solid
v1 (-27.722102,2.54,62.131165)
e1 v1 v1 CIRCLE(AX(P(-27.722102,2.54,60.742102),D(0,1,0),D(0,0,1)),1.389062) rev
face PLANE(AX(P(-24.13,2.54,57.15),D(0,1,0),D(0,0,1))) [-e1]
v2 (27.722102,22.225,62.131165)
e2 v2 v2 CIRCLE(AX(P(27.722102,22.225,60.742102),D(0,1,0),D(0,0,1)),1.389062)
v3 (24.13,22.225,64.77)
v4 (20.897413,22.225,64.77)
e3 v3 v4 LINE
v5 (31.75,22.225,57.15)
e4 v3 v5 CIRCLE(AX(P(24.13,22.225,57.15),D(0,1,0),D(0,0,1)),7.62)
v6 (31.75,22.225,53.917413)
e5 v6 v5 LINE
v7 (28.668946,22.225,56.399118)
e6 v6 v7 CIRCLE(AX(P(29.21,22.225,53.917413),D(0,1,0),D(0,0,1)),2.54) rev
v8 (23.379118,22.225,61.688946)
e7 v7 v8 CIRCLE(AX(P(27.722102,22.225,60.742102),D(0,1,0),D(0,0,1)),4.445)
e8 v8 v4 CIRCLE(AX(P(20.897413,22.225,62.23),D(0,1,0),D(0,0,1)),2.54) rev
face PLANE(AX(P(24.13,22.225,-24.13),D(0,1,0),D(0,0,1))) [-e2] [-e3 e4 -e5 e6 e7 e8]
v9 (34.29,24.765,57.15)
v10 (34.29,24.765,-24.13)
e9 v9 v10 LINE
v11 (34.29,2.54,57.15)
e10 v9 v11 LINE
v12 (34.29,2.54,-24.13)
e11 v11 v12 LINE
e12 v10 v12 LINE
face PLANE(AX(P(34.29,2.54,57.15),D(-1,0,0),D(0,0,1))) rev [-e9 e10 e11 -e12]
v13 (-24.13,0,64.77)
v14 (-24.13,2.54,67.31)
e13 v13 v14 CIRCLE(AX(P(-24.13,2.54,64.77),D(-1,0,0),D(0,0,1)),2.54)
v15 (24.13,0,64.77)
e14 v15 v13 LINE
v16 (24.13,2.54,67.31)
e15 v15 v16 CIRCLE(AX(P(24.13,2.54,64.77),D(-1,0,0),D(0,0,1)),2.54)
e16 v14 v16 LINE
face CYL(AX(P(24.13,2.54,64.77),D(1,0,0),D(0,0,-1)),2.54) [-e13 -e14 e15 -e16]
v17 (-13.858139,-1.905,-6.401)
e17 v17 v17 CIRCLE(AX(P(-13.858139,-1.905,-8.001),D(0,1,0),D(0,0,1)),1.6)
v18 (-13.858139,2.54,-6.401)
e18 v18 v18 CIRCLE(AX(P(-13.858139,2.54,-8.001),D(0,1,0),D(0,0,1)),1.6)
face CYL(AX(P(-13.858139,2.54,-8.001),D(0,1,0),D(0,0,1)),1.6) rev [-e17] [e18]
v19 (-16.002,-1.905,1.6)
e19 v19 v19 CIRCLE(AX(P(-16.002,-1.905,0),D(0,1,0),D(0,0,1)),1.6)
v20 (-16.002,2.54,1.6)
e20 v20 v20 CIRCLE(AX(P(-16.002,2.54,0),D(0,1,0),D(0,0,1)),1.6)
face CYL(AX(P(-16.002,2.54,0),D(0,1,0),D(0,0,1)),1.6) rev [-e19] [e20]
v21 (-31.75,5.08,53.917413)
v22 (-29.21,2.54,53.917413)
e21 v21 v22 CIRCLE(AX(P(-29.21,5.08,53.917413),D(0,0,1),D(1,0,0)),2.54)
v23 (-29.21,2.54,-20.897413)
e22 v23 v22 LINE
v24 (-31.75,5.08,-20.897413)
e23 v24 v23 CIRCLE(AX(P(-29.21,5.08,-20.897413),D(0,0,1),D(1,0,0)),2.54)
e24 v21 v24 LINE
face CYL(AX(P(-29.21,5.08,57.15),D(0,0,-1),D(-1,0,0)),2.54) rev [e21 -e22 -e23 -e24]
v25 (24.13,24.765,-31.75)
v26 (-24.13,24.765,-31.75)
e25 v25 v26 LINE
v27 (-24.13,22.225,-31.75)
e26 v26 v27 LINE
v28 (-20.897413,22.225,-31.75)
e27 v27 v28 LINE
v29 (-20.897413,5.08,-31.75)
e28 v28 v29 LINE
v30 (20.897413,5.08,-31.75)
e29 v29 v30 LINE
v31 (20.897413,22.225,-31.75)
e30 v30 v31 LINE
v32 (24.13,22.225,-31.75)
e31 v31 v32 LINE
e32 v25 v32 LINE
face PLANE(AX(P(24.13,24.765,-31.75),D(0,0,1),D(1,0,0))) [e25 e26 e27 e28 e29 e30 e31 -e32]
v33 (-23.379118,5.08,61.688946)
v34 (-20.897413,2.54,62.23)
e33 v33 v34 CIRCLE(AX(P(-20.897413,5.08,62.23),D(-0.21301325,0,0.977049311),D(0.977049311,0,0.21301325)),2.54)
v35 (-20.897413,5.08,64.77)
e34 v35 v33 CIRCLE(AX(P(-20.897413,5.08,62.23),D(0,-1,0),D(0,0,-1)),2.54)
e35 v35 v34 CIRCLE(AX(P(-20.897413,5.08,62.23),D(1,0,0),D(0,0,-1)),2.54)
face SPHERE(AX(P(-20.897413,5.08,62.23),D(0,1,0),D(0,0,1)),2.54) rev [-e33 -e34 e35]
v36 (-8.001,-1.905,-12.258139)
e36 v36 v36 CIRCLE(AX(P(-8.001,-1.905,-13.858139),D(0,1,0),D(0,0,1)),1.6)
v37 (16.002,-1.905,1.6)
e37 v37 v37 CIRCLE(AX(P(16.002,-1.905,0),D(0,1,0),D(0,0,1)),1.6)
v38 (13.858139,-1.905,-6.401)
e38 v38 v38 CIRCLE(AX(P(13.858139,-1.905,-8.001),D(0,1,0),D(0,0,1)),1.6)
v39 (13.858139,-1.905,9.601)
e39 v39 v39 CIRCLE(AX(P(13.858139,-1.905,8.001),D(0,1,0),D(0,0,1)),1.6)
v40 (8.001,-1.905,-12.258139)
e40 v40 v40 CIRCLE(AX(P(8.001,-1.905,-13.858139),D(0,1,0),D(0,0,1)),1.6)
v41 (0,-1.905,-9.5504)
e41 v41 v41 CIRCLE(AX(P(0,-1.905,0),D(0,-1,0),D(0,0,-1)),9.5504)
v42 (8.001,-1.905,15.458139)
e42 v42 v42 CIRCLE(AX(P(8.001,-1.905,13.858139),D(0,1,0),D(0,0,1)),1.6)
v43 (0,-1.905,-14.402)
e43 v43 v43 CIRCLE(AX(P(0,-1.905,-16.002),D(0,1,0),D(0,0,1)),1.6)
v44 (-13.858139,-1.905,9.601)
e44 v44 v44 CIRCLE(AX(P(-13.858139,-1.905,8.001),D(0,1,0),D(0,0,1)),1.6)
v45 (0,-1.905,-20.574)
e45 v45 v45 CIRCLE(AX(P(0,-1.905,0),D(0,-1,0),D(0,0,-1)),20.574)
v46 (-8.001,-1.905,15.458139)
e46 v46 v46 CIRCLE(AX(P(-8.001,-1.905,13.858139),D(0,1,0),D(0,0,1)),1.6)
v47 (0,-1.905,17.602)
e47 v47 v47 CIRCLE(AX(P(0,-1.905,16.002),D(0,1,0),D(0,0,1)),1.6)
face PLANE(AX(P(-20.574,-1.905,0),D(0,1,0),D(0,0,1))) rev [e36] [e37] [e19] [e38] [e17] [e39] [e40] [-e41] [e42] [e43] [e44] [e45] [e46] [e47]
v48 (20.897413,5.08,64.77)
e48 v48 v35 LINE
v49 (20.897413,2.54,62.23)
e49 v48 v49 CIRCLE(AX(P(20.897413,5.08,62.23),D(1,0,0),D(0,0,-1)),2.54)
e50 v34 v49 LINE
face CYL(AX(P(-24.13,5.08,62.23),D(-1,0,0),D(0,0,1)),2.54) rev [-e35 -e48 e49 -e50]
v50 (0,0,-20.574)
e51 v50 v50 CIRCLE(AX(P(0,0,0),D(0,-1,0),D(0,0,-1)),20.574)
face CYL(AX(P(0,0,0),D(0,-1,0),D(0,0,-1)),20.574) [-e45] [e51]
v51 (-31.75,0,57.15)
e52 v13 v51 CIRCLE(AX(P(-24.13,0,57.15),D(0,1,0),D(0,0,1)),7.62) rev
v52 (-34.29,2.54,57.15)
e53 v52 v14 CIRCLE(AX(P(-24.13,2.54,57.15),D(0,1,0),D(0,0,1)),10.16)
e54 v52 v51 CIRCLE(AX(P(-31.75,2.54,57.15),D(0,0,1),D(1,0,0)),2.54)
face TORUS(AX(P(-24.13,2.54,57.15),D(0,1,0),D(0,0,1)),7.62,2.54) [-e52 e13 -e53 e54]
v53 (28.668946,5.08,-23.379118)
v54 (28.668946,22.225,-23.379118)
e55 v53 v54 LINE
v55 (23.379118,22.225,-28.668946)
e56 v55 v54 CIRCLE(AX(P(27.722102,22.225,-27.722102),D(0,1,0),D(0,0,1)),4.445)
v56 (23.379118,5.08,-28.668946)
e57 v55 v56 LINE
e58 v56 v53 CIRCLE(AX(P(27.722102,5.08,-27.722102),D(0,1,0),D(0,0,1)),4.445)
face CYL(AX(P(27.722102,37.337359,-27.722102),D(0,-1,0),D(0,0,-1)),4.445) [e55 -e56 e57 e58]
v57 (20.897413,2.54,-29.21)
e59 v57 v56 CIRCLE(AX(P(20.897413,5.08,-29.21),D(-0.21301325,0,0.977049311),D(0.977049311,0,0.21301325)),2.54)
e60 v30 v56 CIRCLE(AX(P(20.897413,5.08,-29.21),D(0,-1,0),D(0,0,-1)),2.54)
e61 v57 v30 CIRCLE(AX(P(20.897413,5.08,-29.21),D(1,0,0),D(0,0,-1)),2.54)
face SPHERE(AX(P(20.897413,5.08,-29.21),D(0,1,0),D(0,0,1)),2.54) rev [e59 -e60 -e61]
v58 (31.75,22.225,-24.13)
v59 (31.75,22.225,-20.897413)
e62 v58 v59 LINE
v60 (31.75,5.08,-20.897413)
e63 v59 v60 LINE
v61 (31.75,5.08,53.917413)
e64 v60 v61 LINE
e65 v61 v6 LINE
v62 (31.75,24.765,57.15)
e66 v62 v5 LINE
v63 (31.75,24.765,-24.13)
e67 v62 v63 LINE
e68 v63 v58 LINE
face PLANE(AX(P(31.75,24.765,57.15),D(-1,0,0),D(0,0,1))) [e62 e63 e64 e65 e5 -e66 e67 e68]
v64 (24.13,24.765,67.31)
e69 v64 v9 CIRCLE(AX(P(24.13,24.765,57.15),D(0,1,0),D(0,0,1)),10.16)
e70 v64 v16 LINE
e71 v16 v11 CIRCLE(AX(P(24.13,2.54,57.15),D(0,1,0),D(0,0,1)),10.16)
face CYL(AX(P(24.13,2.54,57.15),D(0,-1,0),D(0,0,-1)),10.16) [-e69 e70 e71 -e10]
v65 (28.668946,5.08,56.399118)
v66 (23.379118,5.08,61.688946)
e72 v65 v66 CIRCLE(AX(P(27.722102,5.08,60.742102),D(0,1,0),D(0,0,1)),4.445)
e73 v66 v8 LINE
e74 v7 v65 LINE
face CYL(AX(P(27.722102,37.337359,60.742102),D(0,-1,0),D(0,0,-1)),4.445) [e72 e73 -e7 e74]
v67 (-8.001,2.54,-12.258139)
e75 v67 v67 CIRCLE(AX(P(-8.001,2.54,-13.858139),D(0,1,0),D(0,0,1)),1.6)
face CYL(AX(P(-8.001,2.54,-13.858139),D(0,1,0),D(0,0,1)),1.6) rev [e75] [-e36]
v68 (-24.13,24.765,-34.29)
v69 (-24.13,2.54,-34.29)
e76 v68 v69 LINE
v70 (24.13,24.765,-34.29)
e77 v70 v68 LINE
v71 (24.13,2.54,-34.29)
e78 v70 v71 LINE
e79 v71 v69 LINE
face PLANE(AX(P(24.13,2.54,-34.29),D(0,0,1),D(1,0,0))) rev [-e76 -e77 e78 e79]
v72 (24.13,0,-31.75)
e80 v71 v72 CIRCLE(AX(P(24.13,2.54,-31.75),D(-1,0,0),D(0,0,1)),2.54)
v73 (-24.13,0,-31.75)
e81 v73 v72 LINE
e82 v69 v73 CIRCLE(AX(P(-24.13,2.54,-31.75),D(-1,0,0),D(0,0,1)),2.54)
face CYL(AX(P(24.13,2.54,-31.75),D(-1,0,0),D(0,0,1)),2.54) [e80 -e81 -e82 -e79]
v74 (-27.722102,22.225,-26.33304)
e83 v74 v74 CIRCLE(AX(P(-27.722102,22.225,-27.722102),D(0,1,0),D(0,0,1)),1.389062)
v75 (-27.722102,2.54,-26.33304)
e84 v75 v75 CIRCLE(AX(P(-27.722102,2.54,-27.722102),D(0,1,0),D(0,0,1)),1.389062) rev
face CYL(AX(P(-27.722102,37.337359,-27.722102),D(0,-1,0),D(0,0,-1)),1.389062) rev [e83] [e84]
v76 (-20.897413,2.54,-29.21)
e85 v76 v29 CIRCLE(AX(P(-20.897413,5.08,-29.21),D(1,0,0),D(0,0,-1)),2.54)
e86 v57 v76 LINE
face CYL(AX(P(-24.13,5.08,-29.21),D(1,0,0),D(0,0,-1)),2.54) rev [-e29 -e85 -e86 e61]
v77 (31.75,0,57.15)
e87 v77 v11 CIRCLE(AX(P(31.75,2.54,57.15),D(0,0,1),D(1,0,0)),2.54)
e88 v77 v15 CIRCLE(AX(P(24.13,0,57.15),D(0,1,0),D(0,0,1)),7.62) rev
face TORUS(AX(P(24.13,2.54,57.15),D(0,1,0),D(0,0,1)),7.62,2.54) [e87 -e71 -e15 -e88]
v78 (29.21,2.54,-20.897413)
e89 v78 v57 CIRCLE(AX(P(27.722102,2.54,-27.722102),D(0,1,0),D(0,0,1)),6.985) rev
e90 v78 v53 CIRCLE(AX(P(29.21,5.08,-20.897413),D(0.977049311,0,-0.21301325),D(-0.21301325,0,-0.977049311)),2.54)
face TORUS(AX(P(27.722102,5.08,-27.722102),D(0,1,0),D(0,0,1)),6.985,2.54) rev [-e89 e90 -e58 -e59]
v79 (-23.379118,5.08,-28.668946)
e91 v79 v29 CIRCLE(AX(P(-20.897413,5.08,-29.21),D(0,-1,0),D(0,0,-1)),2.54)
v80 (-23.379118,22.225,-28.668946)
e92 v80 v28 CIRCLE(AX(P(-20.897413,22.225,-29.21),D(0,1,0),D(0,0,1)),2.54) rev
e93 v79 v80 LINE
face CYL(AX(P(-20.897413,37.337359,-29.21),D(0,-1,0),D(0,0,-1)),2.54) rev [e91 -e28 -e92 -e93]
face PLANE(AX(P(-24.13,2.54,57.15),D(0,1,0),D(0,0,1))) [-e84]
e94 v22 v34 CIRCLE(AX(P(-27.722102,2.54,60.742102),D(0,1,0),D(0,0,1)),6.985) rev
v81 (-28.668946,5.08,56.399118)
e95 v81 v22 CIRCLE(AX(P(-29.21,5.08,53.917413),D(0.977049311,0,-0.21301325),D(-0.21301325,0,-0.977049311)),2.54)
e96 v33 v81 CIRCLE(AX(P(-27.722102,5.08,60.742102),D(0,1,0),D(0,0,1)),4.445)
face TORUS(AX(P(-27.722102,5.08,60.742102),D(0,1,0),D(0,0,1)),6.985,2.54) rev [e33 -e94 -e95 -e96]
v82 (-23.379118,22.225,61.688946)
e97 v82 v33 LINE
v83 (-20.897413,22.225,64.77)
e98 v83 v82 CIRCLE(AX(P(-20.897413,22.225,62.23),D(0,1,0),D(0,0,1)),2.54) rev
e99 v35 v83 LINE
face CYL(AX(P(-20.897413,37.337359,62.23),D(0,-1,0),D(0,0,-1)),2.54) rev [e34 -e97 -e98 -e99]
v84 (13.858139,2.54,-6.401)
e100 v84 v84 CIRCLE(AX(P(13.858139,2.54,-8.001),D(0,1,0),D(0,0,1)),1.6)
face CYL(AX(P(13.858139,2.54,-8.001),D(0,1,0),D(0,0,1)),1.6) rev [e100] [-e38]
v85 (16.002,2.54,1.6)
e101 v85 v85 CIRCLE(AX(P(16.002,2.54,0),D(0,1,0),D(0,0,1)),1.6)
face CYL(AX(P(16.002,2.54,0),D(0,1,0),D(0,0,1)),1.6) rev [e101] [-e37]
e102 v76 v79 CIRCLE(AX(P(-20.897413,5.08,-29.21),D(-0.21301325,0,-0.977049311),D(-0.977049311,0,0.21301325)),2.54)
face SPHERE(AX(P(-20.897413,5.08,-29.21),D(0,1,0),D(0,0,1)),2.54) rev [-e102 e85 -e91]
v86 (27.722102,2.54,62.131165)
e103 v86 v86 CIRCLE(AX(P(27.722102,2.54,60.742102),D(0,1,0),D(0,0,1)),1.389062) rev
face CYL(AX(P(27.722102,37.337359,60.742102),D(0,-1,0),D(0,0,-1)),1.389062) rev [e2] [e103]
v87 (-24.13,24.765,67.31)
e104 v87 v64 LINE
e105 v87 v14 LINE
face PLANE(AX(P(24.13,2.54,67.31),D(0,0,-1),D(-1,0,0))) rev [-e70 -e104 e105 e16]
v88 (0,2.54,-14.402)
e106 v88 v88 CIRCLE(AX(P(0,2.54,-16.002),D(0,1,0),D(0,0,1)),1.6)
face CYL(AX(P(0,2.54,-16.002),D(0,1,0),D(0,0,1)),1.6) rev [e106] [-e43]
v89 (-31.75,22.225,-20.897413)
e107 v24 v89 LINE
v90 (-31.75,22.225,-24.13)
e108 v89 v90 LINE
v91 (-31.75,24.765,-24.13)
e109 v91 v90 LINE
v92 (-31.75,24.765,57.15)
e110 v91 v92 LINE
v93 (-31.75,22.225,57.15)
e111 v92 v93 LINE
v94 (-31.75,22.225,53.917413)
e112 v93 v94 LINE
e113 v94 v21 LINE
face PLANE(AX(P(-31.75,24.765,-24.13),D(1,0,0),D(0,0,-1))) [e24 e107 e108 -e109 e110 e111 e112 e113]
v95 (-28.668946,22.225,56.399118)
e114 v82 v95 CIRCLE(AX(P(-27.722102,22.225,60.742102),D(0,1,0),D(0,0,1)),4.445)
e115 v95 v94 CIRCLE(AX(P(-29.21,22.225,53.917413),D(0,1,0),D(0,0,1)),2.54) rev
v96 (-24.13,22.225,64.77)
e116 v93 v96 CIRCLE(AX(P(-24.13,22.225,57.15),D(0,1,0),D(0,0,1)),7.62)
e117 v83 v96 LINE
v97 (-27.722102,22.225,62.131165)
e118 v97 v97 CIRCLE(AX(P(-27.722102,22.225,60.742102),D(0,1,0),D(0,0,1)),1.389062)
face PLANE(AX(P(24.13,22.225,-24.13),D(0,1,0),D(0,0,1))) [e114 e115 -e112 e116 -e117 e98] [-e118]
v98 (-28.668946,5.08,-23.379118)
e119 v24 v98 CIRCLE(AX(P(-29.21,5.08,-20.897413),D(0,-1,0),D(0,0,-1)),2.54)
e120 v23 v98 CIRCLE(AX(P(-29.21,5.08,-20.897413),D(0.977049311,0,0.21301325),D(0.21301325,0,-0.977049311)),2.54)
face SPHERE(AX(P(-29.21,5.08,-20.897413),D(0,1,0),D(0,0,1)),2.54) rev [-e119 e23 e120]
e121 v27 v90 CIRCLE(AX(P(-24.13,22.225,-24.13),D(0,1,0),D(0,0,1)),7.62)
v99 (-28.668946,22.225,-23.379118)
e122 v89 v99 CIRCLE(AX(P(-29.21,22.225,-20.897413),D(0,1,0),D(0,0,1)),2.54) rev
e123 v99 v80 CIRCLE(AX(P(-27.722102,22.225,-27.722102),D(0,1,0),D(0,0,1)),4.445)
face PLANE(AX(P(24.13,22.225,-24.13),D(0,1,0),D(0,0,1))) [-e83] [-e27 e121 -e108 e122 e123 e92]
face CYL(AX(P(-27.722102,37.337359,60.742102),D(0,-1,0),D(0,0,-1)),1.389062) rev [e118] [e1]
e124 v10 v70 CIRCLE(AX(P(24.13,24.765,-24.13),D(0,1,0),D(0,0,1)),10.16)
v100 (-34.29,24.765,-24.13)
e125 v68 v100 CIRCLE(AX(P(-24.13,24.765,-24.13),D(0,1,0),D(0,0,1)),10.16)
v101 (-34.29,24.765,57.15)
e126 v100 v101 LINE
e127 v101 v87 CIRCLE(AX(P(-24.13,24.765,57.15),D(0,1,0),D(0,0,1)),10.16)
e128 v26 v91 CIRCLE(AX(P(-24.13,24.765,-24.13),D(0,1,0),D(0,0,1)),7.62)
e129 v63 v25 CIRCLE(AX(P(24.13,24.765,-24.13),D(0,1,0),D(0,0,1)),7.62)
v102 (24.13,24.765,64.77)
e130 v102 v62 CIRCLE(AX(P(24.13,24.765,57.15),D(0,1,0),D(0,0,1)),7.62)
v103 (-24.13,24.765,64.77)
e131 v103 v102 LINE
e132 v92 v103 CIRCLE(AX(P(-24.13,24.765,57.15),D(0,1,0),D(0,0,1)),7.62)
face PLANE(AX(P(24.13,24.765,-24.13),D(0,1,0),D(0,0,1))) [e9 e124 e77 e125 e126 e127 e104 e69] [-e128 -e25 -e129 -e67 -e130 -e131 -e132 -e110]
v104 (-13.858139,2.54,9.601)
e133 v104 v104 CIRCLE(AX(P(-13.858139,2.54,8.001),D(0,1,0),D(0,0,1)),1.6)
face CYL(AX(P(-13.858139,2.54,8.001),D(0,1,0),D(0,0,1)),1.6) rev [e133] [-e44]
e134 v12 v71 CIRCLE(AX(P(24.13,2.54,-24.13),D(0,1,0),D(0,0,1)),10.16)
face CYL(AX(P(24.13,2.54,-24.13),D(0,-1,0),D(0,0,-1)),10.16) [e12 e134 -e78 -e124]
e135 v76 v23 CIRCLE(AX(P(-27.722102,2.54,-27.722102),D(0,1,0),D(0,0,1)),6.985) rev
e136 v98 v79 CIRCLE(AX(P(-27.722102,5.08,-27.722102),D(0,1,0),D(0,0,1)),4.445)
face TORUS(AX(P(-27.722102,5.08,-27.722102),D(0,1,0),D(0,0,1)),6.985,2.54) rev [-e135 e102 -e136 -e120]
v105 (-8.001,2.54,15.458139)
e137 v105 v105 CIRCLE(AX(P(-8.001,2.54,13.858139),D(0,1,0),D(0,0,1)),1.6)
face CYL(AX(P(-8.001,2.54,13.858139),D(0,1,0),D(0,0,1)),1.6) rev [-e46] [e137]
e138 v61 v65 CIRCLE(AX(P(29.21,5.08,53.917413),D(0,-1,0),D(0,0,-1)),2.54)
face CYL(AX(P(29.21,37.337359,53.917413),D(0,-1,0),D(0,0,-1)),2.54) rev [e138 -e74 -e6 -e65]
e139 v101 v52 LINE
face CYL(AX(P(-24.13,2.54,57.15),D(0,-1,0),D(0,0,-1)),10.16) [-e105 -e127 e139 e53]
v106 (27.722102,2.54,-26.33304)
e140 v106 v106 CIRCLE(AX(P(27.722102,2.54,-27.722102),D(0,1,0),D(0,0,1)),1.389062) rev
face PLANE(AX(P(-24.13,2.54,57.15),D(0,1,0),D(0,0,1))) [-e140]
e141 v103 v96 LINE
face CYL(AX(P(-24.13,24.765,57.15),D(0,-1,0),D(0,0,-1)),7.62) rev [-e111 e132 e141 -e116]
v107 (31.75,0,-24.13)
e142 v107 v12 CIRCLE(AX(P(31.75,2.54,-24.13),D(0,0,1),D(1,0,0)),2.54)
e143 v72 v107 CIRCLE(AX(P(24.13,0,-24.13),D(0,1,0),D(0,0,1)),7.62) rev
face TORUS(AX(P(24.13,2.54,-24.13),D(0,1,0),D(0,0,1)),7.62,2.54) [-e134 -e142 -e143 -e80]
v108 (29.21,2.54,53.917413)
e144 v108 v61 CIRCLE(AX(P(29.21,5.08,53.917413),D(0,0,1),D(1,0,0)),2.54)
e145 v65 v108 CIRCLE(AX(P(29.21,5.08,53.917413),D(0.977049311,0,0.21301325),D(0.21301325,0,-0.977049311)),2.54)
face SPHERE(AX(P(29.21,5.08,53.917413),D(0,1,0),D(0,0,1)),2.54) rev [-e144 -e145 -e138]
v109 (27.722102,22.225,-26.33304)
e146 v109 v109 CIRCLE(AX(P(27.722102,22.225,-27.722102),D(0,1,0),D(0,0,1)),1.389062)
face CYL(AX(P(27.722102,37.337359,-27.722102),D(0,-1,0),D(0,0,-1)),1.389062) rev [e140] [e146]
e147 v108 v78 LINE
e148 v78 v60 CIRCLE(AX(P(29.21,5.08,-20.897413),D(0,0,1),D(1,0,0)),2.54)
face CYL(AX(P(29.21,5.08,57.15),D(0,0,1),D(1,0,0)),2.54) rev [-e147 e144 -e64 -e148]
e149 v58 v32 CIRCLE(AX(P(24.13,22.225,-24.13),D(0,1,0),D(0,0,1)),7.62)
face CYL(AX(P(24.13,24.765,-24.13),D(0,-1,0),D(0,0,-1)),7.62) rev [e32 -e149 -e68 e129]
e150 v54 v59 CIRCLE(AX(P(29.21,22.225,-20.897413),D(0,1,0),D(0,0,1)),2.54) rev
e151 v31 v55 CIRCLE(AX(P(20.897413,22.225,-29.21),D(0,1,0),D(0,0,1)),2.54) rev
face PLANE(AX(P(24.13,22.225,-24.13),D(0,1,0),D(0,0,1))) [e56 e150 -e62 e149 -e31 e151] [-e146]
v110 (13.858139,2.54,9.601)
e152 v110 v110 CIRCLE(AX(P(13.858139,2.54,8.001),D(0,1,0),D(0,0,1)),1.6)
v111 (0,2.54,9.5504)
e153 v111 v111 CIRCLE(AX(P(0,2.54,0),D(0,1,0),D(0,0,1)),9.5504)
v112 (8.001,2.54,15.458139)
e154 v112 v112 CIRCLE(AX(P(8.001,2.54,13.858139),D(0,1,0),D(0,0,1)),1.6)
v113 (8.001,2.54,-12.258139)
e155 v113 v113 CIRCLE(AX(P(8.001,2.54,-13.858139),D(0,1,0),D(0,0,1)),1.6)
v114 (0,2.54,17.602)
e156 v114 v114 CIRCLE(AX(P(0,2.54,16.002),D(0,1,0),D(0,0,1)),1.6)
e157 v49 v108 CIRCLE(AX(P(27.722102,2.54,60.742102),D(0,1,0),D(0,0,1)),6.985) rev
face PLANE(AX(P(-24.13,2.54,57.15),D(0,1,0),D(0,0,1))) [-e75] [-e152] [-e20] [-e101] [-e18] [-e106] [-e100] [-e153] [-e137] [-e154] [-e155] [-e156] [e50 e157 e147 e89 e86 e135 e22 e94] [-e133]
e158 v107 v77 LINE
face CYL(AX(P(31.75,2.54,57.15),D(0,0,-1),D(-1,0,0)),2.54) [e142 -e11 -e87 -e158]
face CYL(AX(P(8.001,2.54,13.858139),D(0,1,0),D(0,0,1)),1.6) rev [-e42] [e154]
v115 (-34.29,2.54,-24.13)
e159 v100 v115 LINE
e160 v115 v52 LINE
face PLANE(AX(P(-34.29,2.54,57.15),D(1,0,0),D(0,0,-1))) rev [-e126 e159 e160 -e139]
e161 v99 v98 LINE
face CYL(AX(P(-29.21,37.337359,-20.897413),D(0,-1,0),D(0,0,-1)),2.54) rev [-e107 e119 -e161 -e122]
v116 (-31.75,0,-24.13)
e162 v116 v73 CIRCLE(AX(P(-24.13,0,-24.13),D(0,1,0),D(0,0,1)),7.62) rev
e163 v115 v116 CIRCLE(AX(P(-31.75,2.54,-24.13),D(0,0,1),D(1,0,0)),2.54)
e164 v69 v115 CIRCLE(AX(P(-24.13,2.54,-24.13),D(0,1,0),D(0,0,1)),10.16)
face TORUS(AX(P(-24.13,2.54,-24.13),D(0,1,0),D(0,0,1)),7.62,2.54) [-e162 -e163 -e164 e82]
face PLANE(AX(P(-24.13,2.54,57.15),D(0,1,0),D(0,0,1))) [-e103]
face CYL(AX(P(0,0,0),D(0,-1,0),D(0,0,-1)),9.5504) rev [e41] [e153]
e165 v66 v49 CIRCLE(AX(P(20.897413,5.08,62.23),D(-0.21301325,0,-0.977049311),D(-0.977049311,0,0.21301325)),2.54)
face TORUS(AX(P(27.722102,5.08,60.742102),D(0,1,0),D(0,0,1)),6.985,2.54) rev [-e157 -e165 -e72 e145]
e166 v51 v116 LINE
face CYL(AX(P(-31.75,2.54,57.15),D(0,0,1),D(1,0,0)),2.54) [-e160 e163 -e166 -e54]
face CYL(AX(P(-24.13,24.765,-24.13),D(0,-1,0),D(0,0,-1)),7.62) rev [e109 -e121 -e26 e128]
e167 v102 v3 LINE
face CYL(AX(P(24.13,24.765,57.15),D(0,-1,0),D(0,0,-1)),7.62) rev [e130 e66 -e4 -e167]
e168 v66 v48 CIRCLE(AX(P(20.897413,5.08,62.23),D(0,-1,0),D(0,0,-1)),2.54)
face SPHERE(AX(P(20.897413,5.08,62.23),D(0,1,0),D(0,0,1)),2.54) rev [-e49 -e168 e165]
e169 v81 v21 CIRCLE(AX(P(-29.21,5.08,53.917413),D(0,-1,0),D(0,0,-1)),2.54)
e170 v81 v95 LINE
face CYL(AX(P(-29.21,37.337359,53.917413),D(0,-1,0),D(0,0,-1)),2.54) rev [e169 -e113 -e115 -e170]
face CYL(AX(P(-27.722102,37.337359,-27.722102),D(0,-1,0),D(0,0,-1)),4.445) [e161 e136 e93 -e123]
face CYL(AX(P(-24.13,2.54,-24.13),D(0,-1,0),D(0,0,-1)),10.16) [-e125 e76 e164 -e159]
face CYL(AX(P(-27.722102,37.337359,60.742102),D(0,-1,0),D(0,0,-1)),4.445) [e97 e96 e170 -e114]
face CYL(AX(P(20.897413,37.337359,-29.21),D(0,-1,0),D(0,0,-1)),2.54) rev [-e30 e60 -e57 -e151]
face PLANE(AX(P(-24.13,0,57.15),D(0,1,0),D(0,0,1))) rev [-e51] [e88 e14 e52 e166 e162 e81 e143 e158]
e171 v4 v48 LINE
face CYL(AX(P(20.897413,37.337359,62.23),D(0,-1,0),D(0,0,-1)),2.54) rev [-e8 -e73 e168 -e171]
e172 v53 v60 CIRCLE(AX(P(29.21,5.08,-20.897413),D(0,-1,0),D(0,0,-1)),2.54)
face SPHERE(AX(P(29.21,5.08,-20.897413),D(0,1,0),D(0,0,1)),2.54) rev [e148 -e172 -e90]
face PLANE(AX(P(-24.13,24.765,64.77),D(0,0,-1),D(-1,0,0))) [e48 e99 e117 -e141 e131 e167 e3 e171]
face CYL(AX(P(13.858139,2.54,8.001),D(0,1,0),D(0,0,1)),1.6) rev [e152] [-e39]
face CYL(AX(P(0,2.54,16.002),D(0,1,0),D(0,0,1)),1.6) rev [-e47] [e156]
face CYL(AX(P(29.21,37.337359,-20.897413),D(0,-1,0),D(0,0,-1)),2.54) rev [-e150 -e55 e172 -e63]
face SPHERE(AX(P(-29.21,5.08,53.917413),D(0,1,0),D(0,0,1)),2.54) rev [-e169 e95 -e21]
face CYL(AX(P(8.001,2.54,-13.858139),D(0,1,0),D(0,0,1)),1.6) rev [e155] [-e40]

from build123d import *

# Parameters (mm, degrees)
SKETCH1_W            = 11.0236
SKETCH1_H            = 1.905
BOSS_EXTRUDE1_START  = 2.54
SKETCH4_R            = 9.5504
BOSS_EXTRUDE1_DEPTH  = 2.54
M3_CLEARANCE_HOLE1_D = 3.2
BOSS_EXTRUDE4_START  = 22.225
BOSS_EXTRUDE4_DEPTH  = 22.225
FILLET1_R            = 2.54
SKETCH8_R            = 4.445
SKETCH8_R_2          = 1.3890625
BOSS_EXTRUDE5_DEPTH  = 19.685
FILLET3_R            = 2.54
FILLET4_R            = 2.54


with BuildPart() as part:
    # Sketch1 → Revolve1 (revolve)
    with BuildSketch(Plane.XY, mode=Mode.PRIVATE) as revolve1_sk:
        with Locations((-15.0622, -0.9525)):
            Rectangle(SKETCH1_W, SKETCH1_H)
    revolve(revolve1_sk.sketch.rotate(Axis((0, 0, 0), (0, 1, 0)), 270), axis=Axis((0, 0, 0), (0, 1, 0)))

    # Sketch4 → Boss-Extrude1 (add)
    with BuildSketch(Plane(origin=(0, 0, 0), x_dir=(1, 0, 0), z_dir=(0, 1, 0)).offset(BOSS_EXTRUDE1_START)):
        with BuildLine():
            Line((-24.13, -67.31), (24.13, -67.31))
            ThreePointArc((24.13, -67.31), (31.314204897, -64.334204897), (34.29, -57.15))
            Line((34.29, -57.15), (34.29, 24.13))
            ThreePointArc((34.29, 24.13), (31.314204897, 31.314204897), (24.13, 34.29))
            Line((24.13, 34.29), (-24.13, 34.29))
            ThreePointArc((-24.13, 34.29), (-31.314204897, 31.314204897), (-34.29, 24.13))
            Line((-34.29, 24.13), (-34.29, -57.15))
            ThreePointArc((-34.29, -57.15), (-31.314204897, -64.334204897), (-24.13, -67.31))
        make_face()
        Circle(SKETCH4_R, mode=Mode.SUBTRACT)
    extrude(amount=-BOSS_EXTRUDE1_DEPTH)

    # M3 Clearance Hole1 (through all)
    with Locations(Plane(origin=(0, 2.54, 0), x_dir=(1, 0, 0), z_dir=(0, 1, 0))):
        with Locations((-13.858138511, -8.001), (-16.002, 0), (-13.858138511, 8.001), (-8.001, 13.858138511), (0, 16.002), (8.001, 13.858138511), (13.858138511, 8.001), (16.002, 0), (13.858138511, -8.001), (8.001, -13.858138511), (0, -16.002), (-8.001, -13.858138511)):
            Hole(M3_CLEARANCE_HOLE1_D / 2)

    # Sketch6 → Boss-Extrude4 (add)
    with BuildSketch(Plane(origin=(0, 2.54, 0), x_dir=(1, 0, 0), z_dir=(0, 1, 0)).offset(BOSS_EXTRUDE4_START)):
        with BuildLine():
            Line((24.13, 34.29), (-24.13, 34.29))
            ThreePointArc((-24.13, 34.29), (-31.314204897, 31.314204897), (-34.29, 24.13))
            Line((-34.29, 24.13), (-34.29, -57.15))
            ThreePointArc((-34.29, -57.15), (-31.314204897, -64.334204897), (-24.13, -67.31))
            Line((-24.13, -67.31), (24.13, -67.31))
            ThreePointArc((24.13, -67.31), (31.314204897, -64.334204897), (34.29, -57.15))
            Line((34.29, -57.15), (34.29, 24.13))
            ThreePointArc((34.29, 24.13), (31.314204897, 31.314204897), (24.13, 34.29))
        make_face()
        with BuildLine():
            Line((24.13, 31.75), (-24.13, 31.75))
            ThreePointArc((-24.13, 31.75), (-29.518153673, 29.518153673), (-31.75, 24.13))
            Line((-31.75, 24.13), (-31.75, -57.15))
            ThreePointArc((-31.75, -57.15), (-29.518153673, -62.538153673), (-24.13, -64.77))
            Line((-24.13, -64.77), (24.13, -64.77))
            ThreePointArc((24.13, -64.77), (29.518153673, -62.538153673), (31.75, -57.15))
            Line((31.75, -57.15), (31.75, 24.13))
            ThreePointArc((31.75, 24.13), (29.518153673, 29.518153673), (24.13, 31.75))
        make_face(mode=Mode.SUBTRACT)
    extrude(amount=-BOSS_EXTRUDE4_DEPTH)

    # Fillet1
    fillet1_edges = [part.edges().sort_by_distance(p)[0] for p in [
        (-31.314204897, 0, 64.334204897),
        (0, 0, 67.31),
        (31.314204897, 0, 64.334204897),
        (34.29, 0, 16.51),
        (31.314204897, 0, -31.314204897),
        (0, 0, -34.29),
        (-31.314204897, 0, -31.314204897),
        (-34.29, 0, 16.51),
    ]]
    fillet(fillet1_edges, radius=FILLET1_R)

    # Sketch8 → Boss-Extrude5 (add)
    # profile 1 of 4: a face of its own
    with BuildSketch(Plane(origin=(0, 2.54, 0), x_dir=(1, 0, 0), z_dir=(0, 1, 0))):
        with Locations((-27.722102448, -60.742102448)):
            Circle(SKETCH8_R)
        with Locations(Location((-27.722102448, -60.742102448, 0), (0, 0, 270))):
            Circle(SKETCH8_R_2, mode=Mode.SUBTRACT)
    # profile 2 of 4: a face of its own
    with BuildSketch(Plane(origin=(0, 2.54, 0), x_dir=(1, 0, 0), z_dir=(0, 1, 0))):
        with Locations((27.722102448, -60.742102448)):
            Circle(SKETCH8_R)
        with Locations(Location((27.722102448, -60.742102448, 0), (0, 0, 270))):
            Circle(SKETCH8_R_2, mode=Mode.SUBTRACT)
    # profile 3 of 4: a face of its own
    with BuildSketch(Plane(origin=(0, 2.54, 0), x_dir=(1, 0, 0), z_dir=(0, 1, 0))):
        with Locations((27.722102448, 27.722102448)):
            Circle(SKETCH8_R)
        with Locations(Location((27.722102448, 27.722102448, 0), (0, 0, 270))):
            Circle(SKETCH8_R_2, mode=Mode.SUBTRACT)
    # profile 4 of 4: a face of its own
    with BuildSketch(Plane(origin=(0, 2.54, 0), x_dir=(1, 0, 0), z_dir=(0, 1, 0))):
        with Locations((-27.722102448, 27.722102448)):
            Circle(SKETCH8_R)
        with Locations(Location((-27.722102448, 27.722102448, 0), (0, 0, 270))):
            Circle(SKETCH8_R_2, mode=Mode.SUBTRACT)
    extrude(amount=BOSS_EXTRUDE5_DEPTH)

    # Fillet3
    # the kernel refuses this fillet: 2.54 mm, written as the material it adds along each edge
    with BuildSketch(Plane(origin=(25.571770391, 2.54, 64.632359129), x_dir=(-0.5973974080073474, 0, -0.8019453453360166), z_dir=(0, 1, 0)), Plane(origin=(31.612359129, 2.54, -25.571770391), x_dir=(-0.8019453453360167, 0, 0.5973974080073472), z_dir=(0, 1, 0)), Plane(origin=(-25.571770391, 2.54, -31.612359129), x_dir=(0.5973974080073424, 0, 0.8019453453360202), z_dir=(0, 1, 0)), Plane(origin=(-31.612359129, 2.54, 58.591770391), x_dir=(0.8019453453360194, 0, -0.5973974080073438), z_dir=(0, 1, 0))) as fillet3_piece_1:
        with BuildLine():
            CenterArc((4.719009703, 2.313416024), FILLET3_R, 143.316272758, 102.298995101)
            Line((2.682068526, 3.83080544), (2.478374408, 3.982544382))
            ThreePointArc((2.478374408, 3.982544382), (0.547235321, 1.390186295), (-0.228725099, 0.110457363))
            Line((-0.228725099, 0.110457363), (0.104866882, -0.231341602))
            ThreePointArc((0.104866882, -0.231341602), (1.83517044, 0.142521958), (3.565473998, -0.231341602))
            Line((3.565473998, -0.231341602), (3.67034088, 0))
        make_face()
    extrude(amount=19.685)
    with BuildSketch(Plane(origin=(31.612359129, 2.54, 58.591770391), x_dir=(-0.8019453453360176, 0, -0.5973974080073462), z_dir=(0, 1, 0)), Plane(origin=(25.571770391, 2.54, -31.612359129), x_dir=(-0.5973974080073442, 0, 0.801945345336019), z_dir=(0, 1, 0)), Plane(origin=(-31.612359129, 2.54, -25.571770391), x_dir=(0.8019453453360176, 0, 0.5973974080073461), z_dir=(0, 1, 0)), Plane(origin=(-25.571770391, 2.54, 64.632359129), x_dir=(0.5973974080073453, 0, -0.8019453453360182), z_dir=(0, 1, 0))) as fillet3_piece_2:
        with BuildLine():
            CenterArc((4.719009703, -2.313416024), FILLET3_R, 114.384732141, 102.298995101)
            Line((2.682068526, -3.83080544), (2.478374408, -3.982544382))
            ThreePointArc((2.478374408, -3.982544382), (0.547235321, -1.390186295), (-0.228725099, -0.110457363))
            Line((-0.228725099, -0.110457363), (0.104866882, 0.231341602))
            ThreePointArc((0.104866882, 0.231341602), (1.83517044, -0.142521958), (3.565473998, 0.231341602))
            Line((3.565473998, 0.231341602), (3.67034088, 0))
        make_face()
    extrude(amount=19.685)

    # Fillet4
    fillet4_edges = [part.edges().sort_by_distance(p)[0] for p in [
        (0, 2.54, 64.77),
        (-24.579012806, 2.54, -24.579012806),
        (-31.75, 2.54, 16.51),
        (-24.579012806, 2.54, 57.599012806),
        (24.579012806, 2.54, 57.599012806),
        (31.75, 2.54, 16.51),
        (24.579012806, 2.54, -24.579012806),
        (0, 2.54, -31.75),
        (-22.875527809, 2.54, 63.823317877),
        (-30.803317877, 2.54, 55.895527809),
        (-22.875527809, 2.54, -30.803317877),
        (-30.803317877, 2.54, -22.875527809),
        (30.803317877, 2.54, -22.875527809),
        (22.875527809, 2.54, -30.803317877),
        (30.803317877, 2.54, 55.895527809),
        (22.875527809, 2.54, 63.823317877),
    ]]
    fillet(fillet4_edges, radius=FILLET4_R)


solid = part.part
